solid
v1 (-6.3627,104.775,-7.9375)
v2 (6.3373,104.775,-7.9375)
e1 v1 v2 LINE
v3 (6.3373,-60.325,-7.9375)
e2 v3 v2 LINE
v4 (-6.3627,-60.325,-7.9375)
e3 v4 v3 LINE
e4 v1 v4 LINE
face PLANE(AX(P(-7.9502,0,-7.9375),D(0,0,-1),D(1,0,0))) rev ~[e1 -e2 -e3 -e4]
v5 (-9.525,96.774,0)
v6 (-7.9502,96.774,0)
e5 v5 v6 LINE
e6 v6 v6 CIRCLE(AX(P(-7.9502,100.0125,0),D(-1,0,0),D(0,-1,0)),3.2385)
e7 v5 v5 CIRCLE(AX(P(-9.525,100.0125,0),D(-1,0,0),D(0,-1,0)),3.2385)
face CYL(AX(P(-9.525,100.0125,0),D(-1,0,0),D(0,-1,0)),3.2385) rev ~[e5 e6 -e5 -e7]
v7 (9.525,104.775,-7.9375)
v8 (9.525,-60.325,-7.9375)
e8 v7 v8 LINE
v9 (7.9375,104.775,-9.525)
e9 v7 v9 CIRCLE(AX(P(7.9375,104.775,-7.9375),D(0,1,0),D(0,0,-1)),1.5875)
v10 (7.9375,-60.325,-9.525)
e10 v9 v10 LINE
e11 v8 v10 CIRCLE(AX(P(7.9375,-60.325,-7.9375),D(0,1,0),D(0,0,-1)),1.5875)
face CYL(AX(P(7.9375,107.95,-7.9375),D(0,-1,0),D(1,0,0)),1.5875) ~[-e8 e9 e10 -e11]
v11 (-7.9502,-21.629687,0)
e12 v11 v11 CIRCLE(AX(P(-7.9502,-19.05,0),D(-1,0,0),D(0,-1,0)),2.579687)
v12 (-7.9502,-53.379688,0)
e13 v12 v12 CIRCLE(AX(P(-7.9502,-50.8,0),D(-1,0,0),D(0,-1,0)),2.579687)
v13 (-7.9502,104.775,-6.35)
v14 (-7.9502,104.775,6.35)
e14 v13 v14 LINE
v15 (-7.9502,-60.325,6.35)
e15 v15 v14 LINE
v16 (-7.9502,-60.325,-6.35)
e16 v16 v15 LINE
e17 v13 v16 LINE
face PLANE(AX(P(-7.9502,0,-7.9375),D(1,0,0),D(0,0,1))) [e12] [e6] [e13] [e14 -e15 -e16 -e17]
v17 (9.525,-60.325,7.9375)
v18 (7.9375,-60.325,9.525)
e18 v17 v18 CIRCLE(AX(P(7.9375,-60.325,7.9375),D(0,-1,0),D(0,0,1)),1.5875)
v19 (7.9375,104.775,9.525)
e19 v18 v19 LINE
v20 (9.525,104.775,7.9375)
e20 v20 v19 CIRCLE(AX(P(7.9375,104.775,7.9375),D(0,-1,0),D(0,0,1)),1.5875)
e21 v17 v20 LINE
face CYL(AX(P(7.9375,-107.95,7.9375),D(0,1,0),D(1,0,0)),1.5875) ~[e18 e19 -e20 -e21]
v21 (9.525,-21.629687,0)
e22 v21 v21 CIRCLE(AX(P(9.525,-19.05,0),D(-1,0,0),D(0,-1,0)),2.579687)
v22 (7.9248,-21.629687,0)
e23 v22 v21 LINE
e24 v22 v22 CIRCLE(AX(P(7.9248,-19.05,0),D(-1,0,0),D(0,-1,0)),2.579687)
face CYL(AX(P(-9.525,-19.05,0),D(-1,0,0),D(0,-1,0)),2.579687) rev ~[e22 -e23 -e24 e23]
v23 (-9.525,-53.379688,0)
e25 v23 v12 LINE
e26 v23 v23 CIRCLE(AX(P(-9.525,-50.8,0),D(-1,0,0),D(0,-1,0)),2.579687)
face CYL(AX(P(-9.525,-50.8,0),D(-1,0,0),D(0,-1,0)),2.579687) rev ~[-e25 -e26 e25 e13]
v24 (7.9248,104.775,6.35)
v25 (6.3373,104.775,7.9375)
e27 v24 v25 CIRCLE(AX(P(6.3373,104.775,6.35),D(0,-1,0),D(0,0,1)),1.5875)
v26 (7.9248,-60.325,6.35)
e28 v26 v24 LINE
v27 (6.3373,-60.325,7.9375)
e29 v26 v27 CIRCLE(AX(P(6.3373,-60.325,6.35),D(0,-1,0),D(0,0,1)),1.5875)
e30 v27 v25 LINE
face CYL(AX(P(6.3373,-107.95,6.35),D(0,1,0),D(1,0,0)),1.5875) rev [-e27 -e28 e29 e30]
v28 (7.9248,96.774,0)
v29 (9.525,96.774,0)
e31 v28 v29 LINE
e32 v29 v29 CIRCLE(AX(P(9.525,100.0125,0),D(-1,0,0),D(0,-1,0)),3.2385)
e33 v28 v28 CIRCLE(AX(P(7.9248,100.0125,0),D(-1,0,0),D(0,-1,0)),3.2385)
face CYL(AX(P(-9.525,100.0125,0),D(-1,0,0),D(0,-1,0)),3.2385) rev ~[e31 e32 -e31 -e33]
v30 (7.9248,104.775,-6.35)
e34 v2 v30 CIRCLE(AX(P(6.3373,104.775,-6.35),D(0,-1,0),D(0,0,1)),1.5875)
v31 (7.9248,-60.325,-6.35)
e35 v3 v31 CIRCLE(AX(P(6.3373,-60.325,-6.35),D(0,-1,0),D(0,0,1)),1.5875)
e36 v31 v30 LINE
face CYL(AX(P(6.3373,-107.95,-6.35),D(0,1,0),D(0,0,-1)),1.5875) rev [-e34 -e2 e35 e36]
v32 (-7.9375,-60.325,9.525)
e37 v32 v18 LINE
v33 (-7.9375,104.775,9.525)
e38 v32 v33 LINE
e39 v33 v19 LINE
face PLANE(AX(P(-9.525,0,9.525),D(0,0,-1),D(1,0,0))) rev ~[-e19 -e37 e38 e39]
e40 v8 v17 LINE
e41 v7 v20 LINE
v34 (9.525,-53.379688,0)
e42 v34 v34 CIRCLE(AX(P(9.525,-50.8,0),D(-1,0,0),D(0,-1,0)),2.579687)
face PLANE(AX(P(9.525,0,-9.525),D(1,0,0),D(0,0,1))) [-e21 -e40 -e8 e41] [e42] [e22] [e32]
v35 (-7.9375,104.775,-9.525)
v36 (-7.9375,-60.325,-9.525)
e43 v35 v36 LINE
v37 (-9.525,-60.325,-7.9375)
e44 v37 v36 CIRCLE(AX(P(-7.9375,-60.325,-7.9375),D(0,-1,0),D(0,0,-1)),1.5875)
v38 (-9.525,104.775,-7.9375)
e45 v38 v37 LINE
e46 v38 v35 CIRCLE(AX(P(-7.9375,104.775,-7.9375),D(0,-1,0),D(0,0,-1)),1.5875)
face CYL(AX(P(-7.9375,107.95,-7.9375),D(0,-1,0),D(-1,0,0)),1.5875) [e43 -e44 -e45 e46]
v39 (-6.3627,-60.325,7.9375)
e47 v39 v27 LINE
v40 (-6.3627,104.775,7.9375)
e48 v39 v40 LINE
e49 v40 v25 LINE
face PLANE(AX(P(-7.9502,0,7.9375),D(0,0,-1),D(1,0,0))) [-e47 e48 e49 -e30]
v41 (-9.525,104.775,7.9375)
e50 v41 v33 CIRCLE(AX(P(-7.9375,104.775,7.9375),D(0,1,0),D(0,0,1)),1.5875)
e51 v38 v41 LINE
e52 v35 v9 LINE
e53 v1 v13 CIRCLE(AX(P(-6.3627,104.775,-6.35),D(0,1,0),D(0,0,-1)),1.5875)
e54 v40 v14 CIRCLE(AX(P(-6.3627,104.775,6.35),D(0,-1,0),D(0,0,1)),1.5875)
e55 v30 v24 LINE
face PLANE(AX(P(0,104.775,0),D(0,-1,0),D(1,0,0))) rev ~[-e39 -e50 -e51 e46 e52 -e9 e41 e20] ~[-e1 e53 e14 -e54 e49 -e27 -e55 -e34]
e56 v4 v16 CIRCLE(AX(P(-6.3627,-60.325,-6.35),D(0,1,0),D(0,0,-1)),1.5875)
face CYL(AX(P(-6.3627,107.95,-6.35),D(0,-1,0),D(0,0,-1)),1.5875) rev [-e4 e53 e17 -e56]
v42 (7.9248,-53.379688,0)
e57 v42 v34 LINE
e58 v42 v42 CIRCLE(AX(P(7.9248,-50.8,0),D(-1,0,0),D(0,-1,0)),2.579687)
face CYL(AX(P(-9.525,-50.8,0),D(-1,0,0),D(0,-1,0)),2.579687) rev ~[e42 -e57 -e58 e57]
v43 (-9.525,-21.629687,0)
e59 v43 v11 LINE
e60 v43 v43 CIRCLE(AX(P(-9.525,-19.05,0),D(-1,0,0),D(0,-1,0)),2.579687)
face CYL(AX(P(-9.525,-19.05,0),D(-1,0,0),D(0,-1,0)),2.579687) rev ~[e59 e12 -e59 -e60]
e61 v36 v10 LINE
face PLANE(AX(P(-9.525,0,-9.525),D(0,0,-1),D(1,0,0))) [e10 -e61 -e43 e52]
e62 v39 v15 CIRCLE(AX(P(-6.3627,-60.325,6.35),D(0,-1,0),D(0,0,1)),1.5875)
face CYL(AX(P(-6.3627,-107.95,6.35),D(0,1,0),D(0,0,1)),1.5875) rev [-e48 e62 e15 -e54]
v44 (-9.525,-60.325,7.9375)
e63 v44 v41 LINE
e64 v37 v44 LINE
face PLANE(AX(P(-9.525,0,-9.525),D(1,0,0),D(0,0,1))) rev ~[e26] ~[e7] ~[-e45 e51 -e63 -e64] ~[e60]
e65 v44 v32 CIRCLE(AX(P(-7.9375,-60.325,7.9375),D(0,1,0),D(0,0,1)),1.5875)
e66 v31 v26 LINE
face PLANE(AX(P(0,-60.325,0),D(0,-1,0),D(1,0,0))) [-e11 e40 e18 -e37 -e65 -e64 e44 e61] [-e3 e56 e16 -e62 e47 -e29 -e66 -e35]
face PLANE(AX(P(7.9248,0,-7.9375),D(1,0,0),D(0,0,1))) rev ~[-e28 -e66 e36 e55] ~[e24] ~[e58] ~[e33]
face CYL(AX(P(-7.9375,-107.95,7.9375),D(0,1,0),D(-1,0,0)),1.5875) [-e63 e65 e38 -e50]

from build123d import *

# Parameters (mm, degrees)
F0_W     = 19.05
F0_H     = 19.05
F0_W_2   = 15.875
F0_H_2   = 15.875
F1_DEPTH = 107.95
F2_R     = 1.5875
F3_R     = 1.5875
F4_R     = 3.2385
F4_R_2   = 2.5796875
F5_DEPTH = 19.05
F6_DEPTH = 47.625
F7_DEPTH = 3.175


# Not quite as in the source:
# - a length typed as a fraction of an inch, garbled in the dataset ("3 / 203.2 mm" for 3/8 in), is restored


with BuildPart() as f1:
    # F0 (on Front) → F1 (new body, symmetric)
    with BuildSketch(Plane.XZ):
        Rectangle(F0_W, F0_H)
        with Locations((-0.0127, 0)):
            Rectangle(F0_W_2, F0_H_2, mode=Mode.SUBTRACT)
    extrude(amount=F1_DEPTH, both=True)

    # F2
    f2_edges = [f1.edges().sort_by_distance(p)[0] for p in [
        (-9.525, 0, 9.525),
        (-9.525, 0, -9.525),
        (9.525, 0, -9.525),
        (9.525, 0, 9.525),
    ]]
    fillet(f2_edges, radius=F2_R)

    # F3
    f3_edges = [f1.edges().sort_by_distance(p)[0] for p in [
        (-7.9502, 0, 7.9375),
        (-7.9502, 0, -7.9375),
        (7.9248, 0, 7.9375),
        (7.9248, 0, -7.9375),
    ]]
    fillet(f3_edges, radius=F3_R)

    # F4 (on face) → F5 (cut)
    with BuildSketch(Plane(origin=(-9.525, 0, 0), x_dir=(0, -1, 0), z_dir=(-1, 0, 0))):
        with Locations((-100.0125, 0)):
            Circle(F4_R)
        with Locations((19.05, 0)):
            Circle(F4_R_2)
        with Locations((50.8, 0)):
            Circle(F4_R_2)
    extrude(amount=-F5_DEPTH, mode=Mode.SUBTRACT)

    # F6 (cut): a face of the model
    f6_faces = [f1.faces().sort_by_distance(p)[0] for p in [
        (-8.2196076836, -107.95, 0),
    ]]
    extrude(f6_faces, amount=-F6_DEPTH, mode=Mode.SUBTRACT)

    # F7 (cut): a face of the model
    f7_faces = [f1.faces().sort_by_distance(p)[0] for p in [
        (-8.2196076836, 107.95, 0),
    ]]
    extrude(f7_faces, amount=-F7_DEPTH, mode=Mode.SUBTRACT)


solid = f1.part
